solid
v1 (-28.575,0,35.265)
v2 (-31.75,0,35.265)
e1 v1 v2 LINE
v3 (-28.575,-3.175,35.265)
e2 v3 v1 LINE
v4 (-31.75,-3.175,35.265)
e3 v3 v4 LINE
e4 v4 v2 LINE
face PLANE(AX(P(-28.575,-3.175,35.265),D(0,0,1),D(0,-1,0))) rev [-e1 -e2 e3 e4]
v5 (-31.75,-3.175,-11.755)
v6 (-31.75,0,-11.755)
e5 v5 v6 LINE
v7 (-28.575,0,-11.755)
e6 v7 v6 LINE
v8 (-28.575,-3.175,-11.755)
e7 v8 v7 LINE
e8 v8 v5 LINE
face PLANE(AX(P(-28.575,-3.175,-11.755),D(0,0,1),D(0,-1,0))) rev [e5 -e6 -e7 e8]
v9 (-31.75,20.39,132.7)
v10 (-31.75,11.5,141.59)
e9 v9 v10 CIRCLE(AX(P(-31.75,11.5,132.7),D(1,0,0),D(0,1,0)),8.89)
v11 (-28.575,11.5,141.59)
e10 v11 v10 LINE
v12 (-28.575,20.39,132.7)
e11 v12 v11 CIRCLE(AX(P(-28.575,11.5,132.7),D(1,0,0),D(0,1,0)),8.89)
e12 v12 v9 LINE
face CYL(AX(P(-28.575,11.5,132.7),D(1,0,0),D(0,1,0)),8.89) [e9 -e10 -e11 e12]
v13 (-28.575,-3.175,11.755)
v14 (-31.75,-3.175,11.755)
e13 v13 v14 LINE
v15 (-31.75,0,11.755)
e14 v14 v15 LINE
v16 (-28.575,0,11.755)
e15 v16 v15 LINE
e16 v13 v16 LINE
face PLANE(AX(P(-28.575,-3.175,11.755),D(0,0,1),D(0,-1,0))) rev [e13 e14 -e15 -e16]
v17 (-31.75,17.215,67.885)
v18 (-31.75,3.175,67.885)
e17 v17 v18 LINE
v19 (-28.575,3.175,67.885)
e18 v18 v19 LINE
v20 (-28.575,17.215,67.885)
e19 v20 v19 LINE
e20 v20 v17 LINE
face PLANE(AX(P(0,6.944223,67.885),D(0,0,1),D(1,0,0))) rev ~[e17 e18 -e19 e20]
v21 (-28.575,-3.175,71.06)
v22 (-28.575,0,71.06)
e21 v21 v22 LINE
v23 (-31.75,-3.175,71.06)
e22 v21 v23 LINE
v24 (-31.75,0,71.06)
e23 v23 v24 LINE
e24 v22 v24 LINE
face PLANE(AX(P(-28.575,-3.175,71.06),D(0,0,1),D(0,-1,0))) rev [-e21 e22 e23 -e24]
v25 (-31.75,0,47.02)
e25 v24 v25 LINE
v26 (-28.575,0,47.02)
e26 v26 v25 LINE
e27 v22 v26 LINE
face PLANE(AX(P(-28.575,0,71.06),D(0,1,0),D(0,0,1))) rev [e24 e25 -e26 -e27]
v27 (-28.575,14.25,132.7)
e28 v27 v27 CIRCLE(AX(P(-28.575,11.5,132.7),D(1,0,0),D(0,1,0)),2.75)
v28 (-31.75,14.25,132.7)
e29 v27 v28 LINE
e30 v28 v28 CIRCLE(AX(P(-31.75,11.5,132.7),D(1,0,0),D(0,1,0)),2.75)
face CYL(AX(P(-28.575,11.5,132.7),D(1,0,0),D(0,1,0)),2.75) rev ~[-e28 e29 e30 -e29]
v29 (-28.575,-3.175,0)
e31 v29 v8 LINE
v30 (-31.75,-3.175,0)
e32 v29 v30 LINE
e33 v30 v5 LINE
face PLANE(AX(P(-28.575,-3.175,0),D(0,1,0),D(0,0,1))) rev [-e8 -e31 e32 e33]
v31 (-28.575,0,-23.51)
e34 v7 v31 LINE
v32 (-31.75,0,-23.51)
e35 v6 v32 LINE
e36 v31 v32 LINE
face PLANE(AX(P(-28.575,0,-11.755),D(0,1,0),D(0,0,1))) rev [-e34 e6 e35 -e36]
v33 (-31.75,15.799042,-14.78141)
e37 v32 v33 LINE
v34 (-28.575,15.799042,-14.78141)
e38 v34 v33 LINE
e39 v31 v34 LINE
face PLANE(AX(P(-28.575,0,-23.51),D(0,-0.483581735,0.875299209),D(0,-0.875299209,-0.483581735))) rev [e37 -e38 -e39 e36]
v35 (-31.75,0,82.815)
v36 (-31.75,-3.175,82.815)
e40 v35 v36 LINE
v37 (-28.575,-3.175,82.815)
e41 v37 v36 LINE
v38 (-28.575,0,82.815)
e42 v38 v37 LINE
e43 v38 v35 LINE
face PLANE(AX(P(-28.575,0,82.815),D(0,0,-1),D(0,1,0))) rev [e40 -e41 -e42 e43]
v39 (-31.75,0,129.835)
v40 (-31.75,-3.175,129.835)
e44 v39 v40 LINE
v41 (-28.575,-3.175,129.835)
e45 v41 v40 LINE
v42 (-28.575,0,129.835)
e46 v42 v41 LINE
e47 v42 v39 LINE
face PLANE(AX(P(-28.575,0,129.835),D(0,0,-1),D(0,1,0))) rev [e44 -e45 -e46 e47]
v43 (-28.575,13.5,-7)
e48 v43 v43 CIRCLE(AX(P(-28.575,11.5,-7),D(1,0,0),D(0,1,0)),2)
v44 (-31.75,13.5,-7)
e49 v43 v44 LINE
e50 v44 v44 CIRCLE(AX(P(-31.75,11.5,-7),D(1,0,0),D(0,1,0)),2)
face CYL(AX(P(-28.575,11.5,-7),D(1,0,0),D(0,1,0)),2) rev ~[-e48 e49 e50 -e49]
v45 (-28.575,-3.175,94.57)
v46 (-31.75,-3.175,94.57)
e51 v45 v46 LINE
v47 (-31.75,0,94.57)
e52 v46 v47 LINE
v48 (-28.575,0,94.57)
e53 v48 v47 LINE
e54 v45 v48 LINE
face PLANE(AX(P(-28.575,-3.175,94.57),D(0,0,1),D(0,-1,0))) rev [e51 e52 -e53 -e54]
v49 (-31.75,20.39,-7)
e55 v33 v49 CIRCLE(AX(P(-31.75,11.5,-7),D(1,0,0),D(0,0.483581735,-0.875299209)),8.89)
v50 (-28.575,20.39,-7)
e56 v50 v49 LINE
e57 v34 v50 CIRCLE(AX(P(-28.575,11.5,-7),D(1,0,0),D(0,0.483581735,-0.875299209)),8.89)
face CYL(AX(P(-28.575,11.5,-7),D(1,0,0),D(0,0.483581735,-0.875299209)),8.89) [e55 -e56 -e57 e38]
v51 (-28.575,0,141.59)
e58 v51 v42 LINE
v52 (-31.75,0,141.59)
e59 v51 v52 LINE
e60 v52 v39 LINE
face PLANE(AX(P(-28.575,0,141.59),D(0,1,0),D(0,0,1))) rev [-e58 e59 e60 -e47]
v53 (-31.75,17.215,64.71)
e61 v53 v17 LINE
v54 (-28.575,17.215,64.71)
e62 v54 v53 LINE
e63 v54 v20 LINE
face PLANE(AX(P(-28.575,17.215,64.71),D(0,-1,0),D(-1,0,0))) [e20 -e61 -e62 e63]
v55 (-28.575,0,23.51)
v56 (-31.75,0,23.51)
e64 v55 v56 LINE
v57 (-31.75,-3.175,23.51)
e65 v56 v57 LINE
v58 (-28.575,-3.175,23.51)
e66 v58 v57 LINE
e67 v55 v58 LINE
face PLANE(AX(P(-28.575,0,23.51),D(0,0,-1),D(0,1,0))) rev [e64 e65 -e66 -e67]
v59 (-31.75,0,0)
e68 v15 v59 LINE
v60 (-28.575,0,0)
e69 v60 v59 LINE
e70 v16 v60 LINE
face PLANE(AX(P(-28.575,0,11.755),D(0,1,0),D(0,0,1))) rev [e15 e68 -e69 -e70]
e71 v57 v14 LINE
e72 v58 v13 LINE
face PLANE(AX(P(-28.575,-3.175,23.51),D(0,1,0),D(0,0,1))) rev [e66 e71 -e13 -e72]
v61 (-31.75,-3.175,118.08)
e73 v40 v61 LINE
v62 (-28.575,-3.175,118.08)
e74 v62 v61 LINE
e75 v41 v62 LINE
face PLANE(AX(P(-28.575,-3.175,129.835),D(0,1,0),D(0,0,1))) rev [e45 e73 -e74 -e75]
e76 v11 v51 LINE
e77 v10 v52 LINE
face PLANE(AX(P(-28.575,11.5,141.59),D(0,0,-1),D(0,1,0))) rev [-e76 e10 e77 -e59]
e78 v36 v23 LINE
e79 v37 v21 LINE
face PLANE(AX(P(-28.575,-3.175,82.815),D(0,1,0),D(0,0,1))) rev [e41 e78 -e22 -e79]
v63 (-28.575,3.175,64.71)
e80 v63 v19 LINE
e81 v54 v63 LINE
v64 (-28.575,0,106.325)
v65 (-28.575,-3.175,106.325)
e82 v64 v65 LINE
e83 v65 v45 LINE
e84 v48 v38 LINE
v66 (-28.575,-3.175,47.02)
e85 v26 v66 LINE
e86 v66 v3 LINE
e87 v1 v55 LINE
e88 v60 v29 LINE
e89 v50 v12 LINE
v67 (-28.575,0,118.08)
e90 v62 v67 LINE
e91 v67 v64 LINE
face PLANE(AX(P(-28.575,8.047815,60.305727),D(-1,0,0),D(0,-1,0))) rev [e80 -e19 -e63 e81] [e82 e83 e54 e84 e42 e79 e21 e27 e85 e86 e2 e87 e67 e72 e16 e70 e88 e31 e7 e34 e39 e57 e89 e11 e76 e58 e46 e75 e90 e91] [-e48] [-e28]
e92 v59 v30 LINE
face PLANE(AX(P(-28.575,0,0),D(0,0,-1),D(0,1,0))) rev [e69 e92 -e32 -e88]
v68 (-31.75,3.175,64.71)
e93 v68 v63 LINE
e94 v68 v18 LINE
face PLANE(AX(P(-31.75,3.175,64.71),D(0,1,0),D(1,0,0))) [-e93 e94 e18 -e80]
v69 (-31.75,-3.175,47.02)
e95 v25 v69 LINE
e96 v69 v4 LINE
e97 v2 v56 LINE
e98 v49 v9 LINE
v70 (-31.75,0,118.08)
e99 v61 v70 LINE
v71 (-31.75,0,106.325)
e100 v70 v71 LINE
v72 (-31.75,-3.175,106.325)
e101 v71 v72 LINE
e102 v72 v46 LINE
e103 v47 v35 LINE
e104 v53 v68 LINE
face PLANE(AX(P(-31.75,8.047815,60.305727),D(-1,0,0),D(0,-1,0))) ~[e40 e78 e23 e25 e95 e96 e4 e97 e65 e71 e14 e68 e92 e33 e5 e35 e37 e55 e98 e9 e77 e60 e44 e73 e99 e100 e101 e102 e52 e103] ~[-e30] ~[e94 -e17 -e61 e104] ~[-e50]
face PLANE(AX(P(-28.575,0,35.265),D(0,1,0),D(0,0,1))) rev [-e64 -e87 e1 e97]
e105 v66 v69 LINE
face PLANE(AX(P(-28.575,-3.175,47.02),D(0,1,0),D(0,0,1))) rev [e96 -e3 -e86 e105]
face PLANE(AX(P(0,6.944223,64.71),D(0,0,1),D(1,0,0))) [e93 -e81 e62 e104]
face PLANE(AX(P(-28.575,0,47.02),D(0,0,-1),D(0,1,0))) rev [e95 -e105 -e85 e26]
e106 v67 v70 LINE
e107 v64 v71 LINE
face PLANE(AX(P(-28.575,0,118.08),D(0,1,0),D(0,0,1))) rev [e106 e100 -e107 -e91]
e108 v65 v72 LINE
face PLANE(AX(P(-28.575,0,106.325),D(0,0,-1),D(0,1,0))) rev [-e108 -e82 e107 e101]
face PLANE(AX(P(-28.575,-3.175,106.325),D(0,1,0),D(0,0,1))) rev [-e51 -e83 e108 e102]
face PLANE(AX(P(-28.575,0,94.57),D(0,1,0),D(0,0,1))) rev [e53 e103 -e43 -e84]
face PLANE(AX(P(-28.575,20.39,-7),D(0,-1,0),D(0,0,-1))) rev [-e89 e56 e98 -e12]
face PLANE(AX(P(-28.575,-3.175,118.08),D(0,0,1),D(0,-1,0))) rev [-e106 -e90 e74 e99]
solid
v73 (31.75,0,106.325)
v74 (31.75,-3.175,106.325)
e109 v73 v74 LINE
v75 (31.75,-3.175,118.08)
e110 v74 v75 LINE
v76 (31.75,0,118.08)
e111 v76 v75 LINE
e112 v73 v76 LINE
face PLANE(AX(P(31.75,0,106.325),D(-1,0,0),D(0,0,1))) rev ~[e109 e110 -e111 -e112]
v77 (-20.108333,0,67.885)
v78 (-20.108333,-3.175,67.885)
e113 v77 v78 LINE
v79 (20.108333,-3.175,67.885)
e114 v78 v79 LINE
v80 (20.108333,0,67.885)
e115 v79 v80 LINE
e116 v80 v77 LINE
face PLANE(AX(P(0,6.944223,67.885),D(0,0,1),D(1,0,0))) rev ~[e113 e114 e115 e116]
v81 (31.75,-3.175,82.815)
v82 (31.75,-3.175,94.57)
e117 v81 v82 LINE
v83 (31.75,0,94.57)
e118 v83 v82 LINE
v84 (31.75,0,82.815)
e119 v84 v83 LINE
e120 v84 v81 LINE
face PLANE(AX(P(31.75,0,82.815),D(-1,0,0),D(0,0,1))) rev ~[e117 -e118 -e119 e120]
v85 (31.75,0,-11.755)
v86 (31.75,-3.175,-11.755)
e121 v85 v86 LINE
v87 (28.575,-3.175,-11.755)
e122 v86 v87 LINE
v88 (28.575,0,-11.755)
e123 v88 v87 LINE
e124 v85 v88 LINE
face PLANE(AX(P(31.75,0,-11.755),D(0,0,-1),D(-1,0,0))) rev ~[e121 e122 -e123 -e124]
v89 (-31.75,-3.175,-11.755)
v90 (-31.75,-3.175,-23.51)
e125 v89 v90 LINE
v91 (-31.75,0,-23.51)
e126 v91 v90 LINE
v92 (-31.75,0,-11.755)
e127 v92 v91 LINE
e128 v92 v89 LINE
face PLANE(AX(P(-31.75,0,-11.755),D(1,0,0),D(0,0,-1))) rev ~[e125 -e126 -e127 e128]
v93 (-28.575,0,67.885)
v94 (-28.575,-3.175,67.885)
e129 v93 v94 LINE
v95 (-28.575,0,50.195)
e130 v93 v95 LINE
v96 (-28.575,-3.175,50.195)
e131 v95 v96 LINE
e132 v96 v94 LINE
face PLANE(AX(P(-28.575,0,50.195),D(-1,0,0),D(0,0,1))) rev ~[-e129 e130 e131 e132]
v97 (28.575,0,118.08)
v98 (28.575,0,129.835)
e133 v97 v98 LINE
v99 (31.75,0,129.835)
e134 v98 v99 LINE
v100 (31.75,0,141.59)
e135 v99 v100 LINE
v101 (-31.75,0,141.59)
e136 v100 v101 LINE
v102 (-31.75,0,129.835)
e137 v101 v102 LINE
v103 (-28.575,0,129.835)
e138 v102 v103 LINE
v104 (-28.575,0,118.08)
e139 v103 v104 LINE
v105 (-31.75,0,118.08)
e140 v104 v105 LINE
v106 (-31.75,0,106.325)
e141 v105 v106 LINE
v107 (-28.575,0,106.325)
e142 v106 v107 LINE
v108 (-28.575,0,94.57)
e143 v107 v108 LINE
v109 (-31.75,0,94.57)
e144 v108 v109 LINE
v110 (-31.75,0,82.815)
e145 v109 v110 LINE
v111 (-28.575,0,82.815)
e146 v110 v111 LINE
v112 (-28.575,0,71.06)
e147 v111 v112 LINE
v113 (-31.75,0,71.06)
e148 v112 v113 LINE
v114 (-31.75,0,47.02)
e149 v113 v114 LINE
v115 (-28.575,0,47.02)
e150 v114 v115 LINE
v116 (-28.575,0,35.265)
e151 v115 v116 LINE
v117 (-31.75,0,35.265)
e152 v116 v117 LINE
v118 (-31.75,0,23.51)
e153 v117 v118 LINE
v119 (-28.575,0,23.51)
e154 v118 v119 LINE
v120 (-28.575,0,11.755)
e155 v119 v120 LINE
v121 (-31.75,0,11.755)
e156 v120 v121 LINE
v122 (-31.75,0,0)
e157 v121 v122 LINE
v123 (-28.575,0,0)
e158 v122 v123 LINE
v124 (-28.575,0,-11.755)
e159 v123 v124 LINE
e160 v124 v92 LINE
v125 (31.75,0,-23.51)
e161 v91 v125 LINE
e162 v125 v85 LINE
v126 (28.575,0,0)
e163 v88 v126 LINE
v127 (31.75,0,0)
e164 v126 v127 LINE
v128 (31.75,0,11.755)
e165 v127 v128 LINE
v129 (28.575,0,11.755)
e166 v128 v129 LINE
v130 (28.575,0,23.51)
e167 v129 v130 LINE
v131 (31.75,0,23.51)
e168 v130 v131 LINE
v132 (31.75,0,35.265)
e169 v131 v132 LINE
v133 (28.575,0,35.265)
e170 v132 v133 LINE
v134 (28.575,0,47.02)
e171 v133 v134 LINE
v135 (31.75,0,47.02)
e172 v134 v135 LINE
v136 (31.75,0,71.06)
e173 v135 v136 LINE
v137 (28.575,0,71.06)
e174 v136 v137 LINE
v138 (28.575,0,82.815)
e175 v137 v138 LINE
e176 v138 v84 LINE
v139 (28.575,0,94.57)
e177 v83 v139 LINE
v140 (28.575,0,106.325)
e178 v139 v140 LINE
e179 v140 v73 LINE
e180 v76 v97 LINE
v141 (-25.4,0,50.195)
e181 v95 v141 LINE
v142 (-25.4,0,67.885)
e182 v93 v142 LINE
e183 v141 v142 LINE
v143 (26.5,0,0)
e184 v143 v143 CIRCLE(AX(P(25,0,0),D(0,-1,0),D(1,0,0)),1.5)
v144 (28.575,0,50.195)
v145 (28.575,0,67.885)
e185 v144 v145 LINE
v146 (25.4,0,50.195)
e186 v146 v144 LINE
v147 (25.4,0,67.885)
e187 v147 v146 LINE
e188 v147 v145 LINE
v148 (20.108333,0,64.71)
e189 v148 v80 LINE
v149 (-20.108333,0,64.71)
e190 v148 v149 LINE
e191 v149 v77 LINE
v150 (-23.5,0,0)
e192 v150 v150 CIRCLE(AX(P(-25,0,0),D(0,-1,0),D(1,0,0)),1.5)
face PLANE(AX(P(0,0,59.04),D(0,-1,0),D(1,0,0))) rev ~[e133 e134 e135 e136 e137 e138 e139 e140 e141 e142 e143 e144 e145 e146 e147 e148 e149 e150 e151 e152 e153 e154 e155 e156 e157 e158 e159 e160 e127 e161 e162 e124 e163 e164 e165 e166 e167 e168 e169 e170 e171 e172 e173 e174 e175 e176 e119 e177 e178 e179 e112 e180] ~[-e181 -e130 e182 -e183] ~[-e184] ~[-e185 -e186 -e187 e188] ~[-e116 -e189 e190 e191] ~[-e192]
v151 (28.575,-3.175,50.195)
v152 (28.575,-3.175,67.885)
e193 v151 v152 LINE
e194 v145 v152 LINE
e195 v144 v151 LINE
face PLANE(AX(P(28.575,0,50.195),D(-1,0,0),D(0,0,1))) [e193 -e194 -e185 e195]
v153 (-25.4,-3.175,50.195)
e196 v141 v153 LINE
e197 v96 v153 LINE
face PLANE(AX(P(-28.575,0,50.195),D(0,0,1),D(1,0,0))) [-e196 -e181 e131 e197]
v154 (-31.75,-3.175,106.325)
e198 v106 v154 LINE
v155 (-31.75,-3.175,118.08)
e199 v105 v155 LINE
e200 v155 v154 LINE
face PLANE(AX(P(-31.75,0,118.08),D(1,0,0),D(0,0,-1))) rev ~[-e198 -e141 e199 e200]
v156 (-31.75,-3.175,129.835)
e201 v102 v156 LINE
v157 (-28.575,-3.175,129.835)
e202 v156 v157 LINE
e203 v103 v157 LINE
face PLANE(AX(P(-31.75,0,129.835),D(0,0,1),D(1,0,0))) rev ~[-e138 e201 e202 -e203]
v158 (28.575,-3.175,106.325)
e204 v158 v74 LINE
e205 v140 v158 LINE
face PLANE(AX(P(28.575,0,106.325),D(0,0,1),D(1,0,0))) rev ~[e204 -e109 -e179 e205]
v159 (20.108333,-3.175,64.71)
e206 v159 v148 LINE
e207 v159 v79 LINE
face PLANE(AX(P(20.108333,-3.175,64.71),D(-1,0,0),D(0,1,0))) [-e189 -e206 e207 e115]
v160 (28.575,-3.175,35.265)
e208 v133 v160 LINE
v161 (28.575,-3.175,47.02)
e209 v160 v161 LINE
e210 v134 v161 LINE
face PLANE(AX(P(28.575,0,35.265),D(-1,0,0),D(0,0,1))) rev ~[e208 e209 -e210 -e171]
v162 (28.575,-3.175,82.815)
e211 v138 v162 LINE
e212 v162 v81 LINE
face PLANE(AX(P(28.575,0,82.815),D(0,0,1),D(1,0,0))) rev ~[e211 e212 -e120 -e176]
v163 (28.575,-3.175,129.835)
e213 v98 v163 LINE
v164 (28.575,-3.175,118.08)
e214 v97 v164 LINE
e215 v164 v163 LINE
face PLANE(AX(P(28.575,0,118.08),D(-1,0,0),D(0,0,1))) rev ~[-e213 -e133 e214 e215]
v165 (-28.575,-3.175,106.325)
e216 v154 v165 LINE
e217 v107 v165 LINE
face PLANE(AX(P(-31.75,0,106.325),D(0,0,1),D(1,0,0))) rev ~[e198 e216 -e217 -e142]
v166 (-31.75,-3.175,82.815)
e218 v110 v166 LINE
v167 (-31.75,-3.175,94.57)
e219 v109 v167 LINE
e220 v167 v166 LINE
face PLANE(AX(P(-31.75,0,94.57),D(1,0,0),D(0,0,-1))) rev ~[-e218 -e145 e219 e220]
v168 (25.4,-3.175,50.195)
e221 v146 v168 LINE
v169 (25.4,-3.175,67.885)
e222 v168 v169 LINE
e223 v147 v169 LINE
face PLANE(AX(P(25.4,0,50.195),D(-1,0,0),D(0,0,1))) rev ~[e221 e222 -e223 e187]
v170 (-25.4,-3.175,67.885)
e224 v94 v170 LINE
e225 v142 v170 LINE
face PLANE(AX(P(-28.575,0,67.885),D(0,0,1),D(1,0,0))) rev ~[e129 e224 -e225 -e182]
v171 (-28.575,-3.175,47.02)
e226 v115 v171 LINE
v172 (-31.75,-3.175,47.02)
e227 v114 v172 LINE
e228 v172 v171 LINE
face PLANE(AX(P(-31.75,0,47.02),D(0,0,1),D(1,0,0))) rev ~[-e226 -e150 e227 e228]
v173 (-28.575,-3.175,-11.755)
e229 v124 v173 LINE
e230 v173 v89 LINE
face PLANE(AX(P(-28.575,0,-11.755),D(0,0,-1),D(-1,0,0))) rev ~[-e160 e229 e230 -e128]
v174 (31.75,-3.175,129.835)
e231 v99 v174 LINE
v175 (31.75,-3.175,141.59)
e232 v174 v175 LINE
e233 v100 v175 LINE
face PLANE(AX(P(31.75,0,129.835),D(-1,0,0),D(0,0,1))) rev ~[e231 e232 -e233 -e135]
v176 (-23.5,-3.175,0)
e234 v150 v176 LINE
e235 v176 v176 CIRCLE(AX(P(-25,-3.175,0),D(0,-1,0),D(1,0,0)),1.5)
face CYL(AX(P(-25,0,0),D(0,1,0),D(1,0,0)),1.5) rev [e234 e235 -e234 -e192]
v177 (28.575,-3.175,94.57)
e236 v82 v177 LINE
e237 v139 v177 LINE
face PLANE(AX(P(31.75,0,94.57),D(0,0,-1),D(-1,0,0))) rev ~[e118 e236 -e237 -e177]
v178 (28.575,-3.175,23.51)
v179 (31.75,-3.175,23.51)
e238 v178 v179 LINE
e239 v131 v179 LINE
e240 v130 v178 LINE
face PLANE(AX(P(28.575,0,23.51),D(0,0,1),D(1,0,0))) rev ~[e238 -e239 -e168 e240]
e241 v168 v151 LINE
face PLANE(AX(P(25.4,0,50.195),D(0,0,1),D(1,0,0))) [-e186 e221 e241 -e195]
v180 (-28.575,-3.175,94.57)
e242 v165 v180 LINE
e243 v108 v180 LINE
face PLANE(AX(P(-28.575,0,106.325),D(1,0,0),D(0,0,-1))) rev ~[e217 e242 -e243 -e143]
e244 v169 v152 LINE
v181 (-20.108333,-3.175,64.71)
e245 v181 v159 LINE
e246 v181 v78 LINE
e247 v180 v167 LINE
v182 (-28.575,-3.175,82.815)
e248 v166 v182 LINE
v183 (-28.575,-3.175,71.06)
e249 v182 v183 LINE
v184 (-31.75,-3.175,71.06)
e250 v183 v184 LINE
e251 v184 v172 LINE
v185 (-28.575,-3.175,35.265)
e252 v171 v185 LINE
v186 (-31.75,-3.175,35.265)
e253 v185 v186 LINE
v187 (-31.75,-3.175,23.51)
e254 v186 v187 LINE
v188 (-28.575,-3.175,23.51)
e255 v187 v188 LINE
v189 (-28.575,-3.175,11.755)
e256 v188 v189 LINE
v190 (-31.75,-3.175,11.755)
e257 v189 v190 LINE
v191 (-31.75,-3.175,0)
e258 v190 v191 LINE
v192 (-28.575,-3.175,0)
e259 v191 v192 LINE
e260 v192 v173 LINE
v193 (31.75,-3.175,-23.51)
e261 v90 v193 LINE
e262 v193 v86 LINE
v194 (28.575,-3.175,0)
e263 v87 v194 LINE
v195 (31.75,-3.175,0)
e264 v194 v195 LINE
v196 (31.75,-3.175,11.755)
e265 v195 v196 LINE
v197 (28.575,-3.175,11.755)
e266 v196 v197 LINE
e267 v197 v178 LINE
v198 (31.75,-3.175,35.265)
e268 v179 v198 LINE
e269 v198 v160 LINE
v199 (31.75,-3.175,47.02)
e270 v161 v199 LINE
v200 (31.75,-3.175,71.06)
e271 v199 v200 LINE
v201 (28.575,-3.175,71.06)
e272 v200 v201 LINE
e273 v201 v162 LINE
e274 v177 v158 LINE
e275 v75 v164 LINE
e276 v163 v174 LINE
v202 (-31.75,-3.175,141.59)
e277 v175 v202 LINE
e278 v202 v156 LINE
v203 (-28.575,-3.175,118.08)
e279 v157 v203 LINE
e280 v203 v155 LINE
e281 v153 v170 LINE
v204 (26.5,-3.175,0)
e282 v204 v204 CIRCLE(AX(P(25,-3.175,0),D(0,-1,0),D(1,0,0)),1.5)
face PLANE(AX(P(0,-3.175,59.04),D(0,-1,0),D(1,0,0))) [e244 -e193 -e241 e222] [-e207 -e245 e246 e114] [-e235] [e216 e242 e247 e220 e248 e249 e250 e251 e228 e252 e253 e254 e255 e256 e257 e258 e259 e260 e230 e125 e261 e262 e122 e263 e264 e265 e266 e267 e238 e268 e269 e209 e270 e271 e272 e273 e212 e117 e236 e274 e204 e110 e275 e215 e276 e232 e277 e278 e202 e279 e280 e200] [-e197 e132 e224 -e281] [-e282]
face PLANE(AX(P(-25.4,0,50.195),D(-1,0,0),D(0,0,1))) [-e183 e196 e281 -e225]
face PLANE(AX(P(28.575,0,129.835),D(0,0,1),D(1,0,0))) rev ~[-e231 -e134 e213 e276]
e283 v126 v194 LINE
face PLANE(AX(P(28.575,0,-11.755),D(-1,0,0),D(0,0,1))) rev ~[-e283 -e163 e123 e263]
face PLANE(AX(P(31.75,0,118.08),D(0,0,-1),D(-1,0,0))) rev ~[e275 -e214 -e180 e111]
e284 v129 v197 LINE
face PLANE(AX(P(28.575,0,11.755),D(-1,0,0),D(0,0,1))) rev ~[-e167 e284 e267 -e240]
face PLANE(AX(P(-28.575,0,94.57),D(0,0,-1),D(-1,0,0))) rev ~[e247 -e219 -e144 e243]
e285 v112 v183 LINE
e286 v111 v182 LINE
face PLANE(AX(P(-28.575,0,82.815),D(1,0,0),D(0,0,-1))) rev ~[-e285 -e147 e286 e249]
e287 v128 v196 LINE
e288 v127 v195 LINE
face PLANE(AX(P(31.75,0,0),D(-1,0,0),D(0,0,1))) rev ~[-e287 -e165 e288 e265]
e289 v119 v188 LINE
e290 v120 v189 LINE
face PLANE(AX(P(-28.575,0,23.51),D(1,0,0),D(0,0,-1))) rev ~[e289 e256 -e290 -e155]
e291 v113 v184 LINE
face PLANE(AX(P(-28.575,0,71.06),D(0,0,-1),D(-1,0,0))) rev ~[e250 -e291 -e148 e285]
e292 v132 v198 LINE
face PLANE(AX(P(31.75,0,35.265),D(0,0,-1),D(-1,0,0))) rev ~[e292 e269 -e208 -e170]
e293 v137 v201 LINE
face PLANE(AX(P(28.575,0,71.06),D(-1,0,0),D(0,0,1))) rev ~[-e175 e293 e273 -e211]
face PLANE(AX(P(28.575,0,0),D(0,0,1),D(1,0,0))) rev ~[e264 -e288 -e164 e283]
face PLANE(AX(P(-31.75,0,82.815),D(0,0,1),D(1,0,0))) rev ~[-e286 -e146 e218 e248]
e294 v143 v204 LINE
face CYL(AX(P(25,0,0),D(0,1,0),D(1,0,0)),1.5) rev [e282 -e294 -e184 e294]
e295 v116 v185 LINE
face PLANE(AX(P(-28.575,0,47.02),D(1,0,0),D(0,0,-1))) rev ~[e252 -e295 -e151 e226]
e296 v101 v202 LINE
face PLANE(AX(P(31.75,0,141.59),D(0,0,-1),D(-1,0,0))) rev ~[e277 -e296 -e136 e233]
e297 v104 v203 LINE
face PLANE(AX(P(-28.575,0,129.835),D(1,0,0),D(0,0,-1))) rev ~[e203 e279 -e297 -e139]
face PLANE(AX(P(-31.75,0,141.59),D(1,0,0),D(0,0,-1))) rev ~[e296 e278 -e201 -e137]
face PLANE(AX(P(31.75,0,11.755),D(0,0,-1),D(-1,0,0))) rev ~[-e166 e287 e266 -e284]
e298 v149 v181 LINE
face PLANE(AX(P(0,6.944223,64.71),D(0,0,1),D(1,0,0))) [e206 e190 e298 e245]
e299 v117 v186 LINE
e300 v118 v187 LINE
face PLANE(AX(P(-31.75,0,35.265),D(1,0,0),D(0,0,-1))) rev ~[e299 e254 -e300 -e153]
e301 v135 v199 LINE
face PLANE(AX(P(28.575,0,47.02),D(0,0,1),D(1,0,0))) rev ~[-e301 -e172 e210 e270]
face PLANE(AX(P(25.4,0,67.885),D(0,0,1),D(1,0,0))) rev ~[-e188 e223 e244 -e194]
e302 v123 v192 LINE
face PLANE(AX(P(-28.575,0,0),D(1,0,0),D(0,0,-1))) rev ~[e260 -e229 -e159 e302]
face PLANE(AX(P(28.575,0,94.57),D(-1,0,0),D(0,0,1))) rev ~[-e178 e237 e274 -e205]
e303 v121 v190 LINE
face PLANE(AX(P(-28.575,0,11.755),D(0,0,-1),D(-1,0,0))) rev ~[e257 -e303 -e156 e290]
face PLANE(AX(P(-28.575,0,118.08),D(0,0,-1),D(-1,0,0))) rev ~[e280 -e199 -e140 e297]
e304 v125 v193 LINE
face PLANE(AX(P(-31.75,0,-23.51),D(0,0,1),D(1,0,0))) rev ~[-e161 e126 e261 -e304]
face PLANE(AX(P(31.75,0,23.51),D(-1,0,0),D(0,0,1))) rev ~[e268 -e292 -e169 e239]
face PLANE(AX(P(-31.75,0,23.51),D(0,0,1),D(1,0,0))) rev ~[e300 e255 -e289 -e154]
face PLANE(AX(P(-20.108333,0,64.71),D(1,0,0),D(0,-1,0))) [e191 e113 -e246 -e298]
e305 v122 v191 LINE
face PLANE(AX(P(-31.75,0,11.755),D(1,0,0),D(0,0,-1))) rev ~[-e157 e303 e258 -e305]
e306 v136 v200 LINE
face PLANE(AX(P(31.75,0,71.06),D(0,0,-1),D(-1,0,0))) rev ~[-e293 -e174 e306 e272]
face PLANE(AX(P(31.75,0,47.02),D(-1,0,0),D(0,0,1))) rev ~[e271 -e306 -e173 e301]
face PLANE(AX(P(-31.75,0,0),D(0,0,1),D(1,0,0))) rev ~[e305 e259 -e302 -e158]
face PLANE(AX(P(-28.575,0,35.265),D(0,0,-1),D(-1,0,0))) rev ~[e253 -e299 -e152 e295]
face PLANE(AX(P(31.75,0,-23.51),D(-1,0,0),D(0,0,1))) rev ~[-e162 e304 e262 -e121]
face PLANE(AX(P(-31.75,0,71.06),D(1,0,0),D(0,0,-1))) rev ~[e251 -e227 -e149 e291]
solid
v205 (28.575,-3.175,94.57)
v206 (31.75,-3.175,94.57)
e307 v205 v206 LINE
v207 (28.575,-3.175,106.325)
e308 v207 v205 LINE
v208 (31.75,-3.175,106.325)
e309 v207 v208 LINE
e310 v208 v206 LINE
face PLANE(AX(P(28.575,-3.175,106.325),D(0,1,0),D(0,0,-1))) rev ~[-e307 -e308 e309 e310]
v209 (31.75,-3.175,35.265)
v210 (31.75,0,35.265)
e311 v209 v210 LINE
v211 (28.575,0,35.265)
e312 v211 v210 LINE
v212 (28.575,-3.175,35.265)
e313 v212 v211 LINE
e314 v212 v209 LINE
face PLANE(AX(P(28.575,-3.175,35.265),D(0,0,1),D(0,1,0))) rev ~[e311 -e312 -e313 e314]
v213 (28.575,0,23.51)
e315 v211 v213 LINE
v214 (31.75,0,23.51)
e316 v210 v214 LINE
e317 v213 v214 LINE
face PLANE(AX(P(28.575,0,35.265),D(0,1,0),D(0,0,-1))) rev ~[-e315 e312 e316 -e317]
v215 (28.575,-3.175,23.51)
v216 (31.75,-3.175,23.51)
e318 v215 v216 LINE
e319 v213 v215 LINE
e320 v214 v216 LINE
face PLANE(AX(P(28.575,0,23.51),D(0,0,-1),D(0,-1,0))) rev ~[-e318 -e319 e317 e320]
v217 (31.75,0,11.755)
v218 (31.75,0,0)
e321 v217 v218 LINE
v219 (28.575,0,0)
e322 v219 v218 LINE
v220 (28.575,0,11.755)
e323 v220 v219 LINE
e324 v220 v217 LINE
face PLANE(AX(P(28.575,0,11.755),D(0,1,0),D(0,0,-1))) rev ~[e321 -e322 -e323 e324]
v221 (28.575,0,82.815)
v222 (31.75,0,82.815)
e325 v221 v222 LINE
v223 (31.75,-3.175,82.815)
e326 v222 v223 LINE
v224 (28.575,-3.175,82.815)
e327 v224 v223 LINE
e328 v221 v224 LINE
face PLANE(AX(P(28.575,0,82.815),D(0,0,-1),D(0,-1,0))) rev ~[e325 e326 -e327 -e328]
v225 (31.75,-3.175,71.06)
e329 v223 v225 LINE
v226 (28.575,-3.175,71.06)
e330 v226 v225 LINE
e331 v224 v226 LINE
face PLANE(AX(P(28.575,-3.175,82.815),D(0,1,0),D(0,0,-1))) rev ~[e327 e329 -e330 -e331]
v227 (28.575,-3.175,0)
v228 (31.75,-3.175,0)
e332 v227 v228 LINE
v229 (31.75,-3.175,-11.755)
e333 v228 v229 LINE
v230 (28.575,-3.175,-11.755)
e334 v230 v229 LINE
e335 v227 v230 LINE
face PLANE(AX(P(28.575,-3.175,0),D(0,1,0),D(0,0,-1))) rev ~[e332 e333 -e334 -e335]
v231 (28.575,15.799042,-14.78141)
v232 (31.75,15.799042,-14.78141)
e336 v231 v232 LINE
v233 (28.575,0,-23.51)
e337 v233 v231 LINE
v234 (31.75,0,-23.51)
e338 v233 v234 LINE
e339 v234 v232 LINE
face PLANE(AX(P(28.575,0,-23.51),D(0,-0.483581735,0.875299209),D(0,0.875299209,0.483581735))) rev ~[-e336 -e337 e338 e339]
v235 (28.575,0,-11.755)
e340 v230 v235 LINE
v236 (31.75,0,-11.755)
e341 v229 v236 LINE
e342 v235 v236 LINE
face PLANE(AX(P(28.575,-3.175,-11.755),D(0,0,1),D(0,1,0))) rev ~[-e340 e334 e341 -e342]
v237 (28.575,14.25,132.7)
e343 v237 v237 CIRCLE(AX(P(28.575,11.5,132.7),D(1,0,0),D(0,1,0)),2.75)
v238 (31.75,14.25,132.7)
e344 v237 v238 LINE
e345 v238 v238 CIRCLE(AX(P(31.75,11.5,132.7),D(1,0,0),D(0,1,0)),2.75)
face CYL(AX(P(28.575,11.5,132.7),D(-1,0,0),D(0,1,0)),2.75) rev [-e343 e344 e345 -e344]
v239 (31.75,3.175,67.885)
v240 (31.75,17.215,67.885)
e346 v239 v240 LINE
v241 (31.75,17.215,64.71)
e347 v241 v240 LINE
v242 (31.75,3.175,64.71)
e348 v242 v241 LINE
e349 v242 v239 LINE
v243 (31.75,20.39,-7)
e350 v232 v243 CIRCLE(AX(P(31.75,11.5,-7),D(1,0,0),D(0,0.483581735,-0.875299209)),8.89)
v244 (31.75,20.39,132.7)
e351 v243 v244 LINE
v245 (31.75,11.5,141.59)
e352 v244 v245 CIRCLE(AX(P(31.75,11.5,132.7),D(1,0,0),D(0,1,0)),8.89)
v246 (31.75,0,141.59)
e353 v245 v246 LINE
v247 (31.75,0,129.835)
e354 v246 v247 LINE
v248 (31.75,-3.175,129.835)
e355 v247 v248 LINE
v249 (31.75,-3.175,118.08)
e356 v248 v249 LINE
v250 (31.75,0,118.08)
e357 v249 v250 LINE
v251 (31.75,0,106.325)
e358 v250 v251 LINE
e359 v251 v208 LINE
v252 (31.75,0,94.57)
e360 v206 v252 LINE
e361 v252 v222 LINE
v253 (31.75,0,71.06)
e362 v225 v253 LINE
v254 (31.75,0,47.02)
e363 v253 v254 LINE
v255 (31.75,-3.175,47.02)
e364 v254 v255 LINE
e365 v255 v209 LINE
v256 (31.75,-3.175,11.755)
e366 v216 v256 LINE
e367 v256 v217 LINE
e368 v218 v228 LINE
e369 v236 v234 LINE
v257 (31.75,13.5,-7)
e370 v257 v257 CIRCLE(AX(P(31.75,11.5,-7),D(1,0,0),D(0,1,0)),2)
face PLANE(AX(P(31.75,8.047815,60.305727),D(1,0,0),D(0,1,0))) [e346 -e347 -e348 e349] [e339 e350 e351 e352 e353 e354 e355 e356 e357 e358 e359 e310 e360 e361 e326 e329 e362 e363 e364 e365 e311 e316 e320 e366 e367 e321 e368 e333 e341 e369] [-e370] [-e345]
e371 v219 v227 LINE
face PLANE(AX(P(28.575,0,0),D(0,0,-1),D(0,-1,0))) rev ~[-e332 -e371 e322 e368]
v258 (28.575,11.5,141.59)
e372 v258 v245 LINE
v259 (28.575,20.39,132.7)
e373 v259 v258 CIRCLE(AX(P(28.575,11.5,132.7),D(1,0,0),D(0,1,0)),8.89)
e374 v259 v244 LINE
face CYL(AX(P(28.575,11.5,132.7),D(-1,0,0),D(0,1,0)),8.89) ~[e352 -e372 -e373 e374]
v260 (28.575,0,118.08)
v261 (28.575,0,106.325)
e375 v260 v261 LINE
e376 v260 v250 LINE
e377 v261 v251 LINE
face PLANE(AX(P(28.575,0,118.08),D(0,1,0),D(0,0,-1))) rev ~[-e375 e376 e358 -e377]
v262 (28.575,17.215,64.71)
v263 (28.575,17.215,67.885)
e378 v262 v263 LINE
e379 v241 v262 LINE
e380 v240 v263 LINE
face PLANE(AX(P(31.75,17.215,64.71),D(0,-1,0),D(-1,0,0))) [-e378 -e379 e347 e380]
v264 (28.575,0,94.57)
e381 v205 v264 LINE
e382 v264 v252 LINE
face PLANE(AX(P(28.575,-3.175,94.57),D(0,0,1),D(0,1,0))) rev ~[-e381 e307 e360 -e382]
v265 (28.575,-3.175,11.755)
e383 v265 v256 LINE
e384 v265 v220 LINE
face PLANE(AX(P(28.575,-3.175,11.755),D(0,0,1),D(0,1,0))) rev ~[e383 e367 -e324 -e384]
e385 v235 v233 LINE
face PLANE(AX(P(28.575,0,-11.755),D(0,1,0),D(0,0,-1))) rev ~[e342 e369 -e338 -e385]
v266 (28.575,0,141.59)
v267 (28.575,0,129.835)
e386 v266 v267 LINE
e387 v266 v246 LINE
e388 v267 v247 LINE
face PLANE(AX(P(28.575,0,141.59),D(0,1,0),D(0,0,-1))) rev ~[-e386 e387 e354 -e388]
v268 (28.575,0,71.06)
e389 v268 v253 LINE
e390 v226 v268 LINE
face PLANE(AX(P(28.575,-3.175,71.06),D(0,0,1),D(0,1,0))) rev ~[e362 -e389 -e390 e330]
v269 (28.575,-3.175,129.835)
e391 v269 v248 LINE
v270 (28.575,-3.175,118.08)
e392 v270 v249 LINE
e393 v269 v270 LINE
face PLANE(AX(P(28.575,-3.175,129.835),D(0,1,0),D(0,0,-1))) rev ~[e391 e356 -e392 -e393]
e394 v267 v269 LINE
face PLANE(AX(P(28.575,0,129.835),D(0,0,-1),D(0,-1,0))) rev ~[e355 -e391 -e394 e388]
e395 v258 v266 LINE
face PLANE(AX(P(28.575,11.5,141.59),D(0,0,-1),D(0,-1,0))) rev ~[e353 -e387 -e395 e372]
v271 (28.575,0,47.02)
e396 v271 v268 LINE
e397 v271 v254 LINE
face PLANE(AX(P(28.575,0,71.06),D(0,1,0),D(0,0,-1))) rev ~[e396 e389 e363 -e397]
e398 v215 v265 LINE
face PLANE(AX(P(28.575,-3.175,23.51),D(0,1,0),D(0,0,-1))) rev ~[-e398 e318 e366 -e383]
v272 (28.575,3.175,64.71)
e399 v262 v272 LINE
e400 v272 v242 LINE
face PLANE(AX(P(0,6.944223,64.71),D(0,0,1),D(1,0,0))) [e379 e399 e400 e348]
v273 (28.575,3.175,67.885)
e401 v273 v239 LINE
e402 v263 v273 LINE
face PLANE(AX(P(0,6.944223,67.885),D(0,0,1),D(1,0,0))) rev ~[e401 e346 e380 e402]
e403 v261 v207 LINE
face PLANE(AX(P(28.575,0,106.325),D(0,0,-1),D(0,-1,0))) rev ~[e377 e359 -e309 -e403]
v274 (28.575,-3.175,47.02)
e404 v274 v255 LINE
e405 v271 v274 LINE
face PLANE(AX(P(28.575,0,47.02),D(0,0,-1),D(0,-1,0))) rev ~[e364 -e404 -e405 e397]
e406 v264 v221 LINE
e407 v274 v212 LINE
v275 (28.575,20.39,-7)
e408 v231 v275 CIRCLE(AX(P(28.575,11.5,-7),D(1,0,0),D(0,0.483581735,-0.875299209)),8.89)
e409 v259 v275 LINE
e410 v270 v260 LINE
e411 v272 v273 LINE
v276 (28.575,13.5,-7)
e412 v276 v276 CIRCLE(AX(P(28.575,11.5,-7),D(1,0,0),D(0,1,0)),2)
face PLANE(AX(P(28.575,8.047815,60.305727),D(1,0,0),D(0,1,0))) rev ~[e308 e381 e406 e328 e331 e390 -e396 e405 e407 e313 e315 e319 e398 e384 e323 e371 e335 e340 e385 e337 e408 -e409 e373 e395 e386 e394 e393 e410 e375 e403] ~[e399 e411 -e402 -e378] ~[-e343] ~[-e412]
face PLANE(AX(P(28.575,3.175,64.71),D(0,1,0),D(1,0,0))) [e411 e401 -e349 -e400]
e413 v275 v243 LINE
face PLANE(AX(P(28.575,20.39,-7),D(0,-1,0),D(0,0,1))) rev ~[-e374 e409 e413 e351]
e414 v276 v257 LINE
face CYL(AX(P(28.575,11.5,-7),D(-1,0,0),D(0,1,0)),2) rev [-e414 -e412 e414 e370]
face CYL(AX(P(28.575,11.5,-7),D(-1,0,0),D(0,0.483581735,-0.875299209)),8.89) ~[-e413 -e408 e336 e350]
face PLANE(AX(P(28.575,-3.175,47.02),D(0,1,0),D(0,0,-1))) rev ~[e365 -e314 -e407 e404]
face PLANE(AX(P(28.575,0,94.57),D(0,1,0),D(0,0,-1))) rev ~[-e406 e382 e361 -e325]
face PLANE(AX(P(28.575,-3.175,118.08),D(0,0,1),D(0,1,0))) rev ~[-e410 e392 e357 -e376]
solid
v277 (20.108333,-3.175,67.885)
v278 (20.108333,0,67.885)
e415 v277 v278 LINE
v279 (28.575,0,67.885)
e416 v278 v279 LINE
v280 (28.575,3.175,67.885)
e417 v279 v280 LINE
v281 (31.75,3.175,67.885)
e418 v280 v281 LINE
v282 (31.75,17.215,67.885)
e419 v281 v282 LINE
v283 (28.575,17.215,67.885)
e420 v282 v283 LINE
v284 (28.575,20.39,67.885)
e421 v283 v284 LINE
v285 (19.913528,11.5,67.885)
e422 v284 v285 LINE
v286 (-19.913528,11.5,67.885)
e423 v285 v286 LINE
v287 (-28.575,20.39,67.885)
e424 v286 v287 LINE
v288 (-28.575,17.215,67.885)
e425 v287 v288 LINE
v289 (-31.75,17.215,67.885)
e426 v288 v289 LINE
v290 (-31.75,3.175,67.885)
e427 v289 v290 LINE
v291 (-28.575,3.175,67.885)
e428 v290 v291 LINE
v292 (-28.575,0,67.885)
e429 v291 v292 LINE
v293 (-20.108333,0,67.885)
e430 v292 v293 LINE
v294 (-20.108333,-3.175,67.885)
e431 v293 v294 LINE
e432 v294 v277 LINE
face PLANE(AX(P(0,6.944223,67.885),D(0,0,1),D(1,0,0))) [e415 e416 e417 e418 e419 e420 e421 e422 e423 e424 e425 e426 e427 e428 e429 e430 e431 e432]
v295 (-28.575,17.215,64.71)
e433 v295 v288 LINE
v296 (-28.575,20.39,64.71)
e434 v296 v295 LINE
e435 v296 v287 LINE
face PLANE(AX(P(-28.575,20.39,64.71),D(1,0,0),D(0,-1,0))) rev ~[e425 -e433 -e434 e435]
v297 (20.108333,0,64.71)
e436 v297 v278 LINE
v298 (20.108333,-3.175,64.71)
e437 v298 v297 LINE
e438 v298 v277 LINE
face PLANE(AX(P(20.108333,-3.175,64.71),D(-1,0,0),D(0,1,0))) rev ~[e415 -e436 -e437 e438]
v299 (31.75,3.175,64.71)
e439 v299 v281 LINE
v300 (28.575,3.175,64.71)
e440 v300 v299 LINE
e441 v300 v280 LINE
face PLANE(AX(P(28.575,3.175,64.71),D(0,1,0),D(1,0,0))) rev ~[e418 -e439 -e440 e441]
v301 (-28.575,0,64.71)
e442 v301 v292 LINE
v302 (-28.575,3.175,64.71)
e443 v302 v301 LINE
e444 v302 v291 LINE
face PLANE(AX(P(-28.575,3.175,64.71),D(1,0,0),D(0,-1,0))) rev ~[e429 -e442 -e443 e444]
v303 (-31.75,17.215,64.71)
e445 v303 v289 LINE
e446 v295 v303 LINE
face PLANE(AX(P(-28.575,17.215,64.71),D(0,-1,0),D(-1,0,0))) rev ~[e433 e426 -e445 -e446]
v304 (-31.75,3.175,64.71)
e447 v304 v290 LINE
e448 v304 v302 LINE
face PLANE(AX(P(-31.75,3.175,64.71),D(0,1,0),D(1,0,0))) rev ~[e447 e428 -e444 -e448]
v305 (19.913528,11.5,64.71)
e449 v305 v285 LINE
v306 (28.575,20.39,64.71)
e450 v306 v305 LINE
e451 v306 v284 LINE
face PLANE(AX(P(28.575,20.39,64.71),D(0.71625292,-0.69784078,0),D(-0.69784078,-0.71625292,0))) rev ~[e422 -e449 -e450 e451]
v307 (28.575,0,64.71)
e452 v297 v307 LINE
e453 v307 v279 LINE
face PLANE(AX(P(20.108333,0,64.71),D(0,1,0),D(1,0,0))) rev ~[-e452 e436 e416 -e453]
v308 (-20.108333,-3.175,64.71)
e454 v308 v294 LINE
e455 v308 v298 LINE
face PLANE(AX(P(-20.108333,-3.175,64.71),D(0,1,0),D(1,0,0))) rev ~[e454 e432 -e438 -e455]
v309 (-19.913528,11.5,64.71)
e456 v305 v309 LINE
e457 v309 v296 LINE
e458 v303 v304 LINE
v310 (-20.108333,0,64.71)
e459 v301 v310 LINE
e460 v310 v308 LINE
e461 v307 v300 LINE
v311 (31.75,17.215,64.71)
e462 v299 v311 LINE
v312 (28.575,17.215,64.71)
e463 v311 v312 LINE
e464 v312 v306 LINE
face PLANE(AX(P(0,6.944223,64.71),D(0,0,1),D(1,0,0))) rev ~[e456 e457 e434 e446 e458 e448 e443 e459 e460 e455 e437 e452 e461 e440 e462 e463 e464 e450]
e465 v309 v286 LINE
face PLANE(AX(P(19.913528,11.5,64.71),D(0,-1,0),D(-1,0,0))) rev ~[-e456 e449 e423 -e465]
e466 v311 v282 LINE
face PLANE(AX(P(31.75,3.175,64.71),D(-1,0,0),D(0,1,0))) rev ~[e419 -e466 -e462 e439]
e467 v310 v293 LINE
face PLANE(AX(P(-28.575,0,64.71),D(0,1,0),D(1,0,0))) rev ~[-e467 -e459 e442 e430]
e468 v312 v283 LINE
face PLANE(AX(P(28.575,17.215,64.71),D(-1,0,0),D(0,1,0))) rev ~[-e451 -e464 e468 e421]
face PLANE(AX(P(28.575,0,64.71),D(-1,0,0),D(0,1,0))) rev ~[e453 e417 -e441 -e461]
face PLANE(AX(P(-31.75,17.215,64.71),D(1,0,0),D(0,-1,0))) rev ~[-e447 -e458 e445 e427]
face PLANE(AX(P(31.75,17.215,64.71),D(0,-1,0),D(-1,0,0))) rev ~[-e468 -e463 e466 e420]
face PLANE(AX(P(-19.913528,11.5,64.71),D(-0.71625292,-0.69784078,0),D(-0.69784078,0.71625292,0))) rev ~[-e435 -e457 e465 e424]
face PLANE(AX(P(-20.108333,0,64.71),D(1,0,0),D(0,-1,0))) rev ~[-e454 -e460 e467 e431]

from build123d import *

# Parameters (mm, degrees)
F3_R      = 1.5
F3_W      = 3.175
F3_H      = 17.69
F4_DEPTH  = 3.175
F6_START  = 28.575
F5_R      = 2
F5_R_2    = 2.75
F6_DEPTH  = 3.175
F9_START  = 64.71
F9_DEPTH  = 3.175
F10_START = 64.71
F10_DEPTH = 3.175


# Not quite as in the source:
# - a variable given as a bare number and used for a length is read in inches; the dataset says mm whatever the document's units were


with BuildPart() as f4:
    # F3 (on Front) → F4 (new body)
    with BuildSketch(Plane.XZ):
        Polygon((-31.75, -23.51), (0, -23.51), (31.75, -23.51), (31.75, -11.755), (28.575, -11.755), (28.575, 0), (31.75, 0), (31.75, 11.755), (28.575, 11.755), (28.575, 23.51), (31.75, 23.51), (31.75, 35.265), (28.575, 35.265), (28.575, 47.02), (31.75, 47.02), (31.75, 59.04), (31.75, 71.06), (28.575, 71.06), (28.575, 82.815), (31.75, 82.815), (31.75, 94.57), (28.575, 94.57), (28.575, 106.325), (31.75, 106.325), (31.75, 118.08), (28.575, 118.08), (28.575, 129.835), (31.75, 129.835), (31.75, 141.59), (0, 141.59), (-31.75, 141.59), (-31.75, 129.835), (-28.575, 129.835), (-28.575, 118.08), (-31.75, 118.08), (-31.75, 106.325), (-28.575, 106.325), (-28.575, 94.57), (-31.75, 94.57), (-31.75, 82.815), (-28.575, 82.815), (-28.575, 71.06), (-31.75, 71.06), (-31.75, 59.04), (-31.75, 47.02), (-28.575, 47.02), (-28.575, 35.265), (-31.75, 35.265), (-31.75, 23.51), (-28.575, 23.51), (-28.575, 11.755), (-31.75, 11.755), (-31.75, 0), (-28.575, 0), (-28.575, -11.755), (-31.75, -11.755), align=None)
        with Locations((-25, 0)):
            Circle(F3_R, mode=Mode.SUBTRACT)
        with Locations((-26.9875, 59.04)):
            Rectangle(F3_W, F3_H, mode=Mode.SUBTRACT)
        with Locations((25, 0)):
            Circle(F3_R, mode=Mode.SUBTRACT)
        with Locations((26.9875, 59.04)):
            Rectangle(F3_W, F3_H, mode=Mode.SUBTRACT)
    extrude(amount=F4_DEPTH)


with BuildPart() as f6:
    # F5 (on Right) → F6 (new body)
    with BuildSketch(Plane.YZ.offset(F6_START)):
        with BuildLine():
            Line((0, -11.755), (0, -23.51))
            Line((0, -23.51), (15.7990416202, -14.7814099717))
            ThreePointArc((15.7990416202, -14.7814099717), (19.1567153533, -11.5173897328), (20.39, -7))
            Line((20.39, -7), (20.39, 132.7))
            ThreePointArc((20.39, 132.7), (17.7861792847, 138.9861792847), (11.5, 141.59))
            Line((11.5, 141.59), (1.9673842471, 141.59))
            Line((1.9673842471, 141.59), (0, 141.59))
            Line((0, 141.59), (0, 129.835))
            Line((0, 129.835), (-3.175, 129.835))
            Line((-3.175, 129.835), (-3.175, 118.08))
            Line((-3.175, 118.08), (0, 118.08))
            Line((0, 118.08), (0, 106.325))
            Line((0, 106.325), (-3.175, 106.325))
            Line((-3.175, 106.325), (-3.175, 94.57))
            Line((-3.175, 94.57), (0, 94.57))
            Line((0, 94.57), (0, 82.815))
            Line((0, 82.815), (-3.175, 82.815))
            Line((-3.175, 82.815), (-3.175, 71.06))
            Line((-3.175, 71.06), (0, 71.06))
            Line((0, 71.06), (0, 59.04))
            Line((0, 59.04), (0, 47.02))
            Line((0, 47.02), (-3.175, 47.02))
            Line((-3.175, 47.02), (-3.175, 35.265))
            Line((-3.175, 35.265), (0, 35.265))
            Line((0, 35.265), (0, 23.51))
            Line((0, 23.51), (-3.175, 23.51))
            Line((-3.175, 23.51), (-3.175, 11.755))
            Line((-3.175, 11.755), (0, 11.755))
            Line((0, 11.755), (0, 0))
            Line((0, 0), (-3.175, 0))
            Line((-3.175, 0), (-3.175, -11.755))
            Line((-3.175, -11.755), (0, -11.755))
        make_face()
        with Locations((11.5, -7)):
            Circle(F5_R, mode=Mode.SUBTRACT)
        with Locations((11.5, 132.7)):
            Circle(F5_R_2, mode=Mode.SUBTRACT)
    extrude(amount=F6_DEPTH)


with BuildPart() as f7_1:
    # F7: instance of F6
    add(f6.part.mirror(Plane.YZ))


with BuildPart() as f9_tool:
    # F8 (on Top) → F9 (new body)
    with BuildSketch(Plane.XY.offset(F9_START)):
        Polygon((19.9135281146, 11.5), (0, 11.5), (-19.9135281146, 11.5), (-28.575, 20.39), (-28.575, 17.215), (-31.75, 17.215), (-31.75, 3.175), (-28.575, 3.175), (-28.575, 0), (-20.1083333333, 0), (-20.1083333333, -3.175), (0, -3.175), (20.1083333333, -3.175), (20.1083333333, 0), (28.575, 0), (28.575, 3.175), (31.75, 3.175), (31.75, 17.215), (28.575, 17.215), (28.575, 20.39), align=None)
    extrude(amount=F9_DEPTH)


with BuildPart() as f4_1:
    add(f4.part)

    # F9: cut by f9_tool
    add(f9_tool.part, mode=Mode.SUBTRACT)


with BuildPart() as f6_1:
    add(f6.part)

    # F9: cut by f9_tool
    add(f9_tool.part, mode=Mode.SUBTRACT)


with BuildPart() as f7_1_1:
    add(f7_1.part)

    # F9: cut by f9_tool
    add(f9_tool.part, mode=Mode.SUBTRACT)


with BuildPart() as f10:
    # F8 (on Top) → F10 (new body)
    with BuildSketch(Plane.XY.offset(F10_START)):
        Polygon((19.9135281146, 11.5), (0, 11.5), (-19.9135281146, 11.5), (-28.575, 20.39), (-28.575, 17.215), (-31.75, 17.215), (-31.75, 3.175), (-28.575, 3.175), (-28.575, 0), (-20.1083333333, 0), (-20.1083333333, -3.175), (0, -3.175), (20.1083333333, -3.175), (20.1083333333, 0), (28.575, 0), (28.575, 3.175), (31.75, 3.175), (31.75, 17.215), (28.575, 17.215), (28.575, 20.39), align=None)
    extrude(amount=F10_DEPTH)


solid = Compound([f4_1.part, f6_1.part, f7_1_1.part, f10.part])
